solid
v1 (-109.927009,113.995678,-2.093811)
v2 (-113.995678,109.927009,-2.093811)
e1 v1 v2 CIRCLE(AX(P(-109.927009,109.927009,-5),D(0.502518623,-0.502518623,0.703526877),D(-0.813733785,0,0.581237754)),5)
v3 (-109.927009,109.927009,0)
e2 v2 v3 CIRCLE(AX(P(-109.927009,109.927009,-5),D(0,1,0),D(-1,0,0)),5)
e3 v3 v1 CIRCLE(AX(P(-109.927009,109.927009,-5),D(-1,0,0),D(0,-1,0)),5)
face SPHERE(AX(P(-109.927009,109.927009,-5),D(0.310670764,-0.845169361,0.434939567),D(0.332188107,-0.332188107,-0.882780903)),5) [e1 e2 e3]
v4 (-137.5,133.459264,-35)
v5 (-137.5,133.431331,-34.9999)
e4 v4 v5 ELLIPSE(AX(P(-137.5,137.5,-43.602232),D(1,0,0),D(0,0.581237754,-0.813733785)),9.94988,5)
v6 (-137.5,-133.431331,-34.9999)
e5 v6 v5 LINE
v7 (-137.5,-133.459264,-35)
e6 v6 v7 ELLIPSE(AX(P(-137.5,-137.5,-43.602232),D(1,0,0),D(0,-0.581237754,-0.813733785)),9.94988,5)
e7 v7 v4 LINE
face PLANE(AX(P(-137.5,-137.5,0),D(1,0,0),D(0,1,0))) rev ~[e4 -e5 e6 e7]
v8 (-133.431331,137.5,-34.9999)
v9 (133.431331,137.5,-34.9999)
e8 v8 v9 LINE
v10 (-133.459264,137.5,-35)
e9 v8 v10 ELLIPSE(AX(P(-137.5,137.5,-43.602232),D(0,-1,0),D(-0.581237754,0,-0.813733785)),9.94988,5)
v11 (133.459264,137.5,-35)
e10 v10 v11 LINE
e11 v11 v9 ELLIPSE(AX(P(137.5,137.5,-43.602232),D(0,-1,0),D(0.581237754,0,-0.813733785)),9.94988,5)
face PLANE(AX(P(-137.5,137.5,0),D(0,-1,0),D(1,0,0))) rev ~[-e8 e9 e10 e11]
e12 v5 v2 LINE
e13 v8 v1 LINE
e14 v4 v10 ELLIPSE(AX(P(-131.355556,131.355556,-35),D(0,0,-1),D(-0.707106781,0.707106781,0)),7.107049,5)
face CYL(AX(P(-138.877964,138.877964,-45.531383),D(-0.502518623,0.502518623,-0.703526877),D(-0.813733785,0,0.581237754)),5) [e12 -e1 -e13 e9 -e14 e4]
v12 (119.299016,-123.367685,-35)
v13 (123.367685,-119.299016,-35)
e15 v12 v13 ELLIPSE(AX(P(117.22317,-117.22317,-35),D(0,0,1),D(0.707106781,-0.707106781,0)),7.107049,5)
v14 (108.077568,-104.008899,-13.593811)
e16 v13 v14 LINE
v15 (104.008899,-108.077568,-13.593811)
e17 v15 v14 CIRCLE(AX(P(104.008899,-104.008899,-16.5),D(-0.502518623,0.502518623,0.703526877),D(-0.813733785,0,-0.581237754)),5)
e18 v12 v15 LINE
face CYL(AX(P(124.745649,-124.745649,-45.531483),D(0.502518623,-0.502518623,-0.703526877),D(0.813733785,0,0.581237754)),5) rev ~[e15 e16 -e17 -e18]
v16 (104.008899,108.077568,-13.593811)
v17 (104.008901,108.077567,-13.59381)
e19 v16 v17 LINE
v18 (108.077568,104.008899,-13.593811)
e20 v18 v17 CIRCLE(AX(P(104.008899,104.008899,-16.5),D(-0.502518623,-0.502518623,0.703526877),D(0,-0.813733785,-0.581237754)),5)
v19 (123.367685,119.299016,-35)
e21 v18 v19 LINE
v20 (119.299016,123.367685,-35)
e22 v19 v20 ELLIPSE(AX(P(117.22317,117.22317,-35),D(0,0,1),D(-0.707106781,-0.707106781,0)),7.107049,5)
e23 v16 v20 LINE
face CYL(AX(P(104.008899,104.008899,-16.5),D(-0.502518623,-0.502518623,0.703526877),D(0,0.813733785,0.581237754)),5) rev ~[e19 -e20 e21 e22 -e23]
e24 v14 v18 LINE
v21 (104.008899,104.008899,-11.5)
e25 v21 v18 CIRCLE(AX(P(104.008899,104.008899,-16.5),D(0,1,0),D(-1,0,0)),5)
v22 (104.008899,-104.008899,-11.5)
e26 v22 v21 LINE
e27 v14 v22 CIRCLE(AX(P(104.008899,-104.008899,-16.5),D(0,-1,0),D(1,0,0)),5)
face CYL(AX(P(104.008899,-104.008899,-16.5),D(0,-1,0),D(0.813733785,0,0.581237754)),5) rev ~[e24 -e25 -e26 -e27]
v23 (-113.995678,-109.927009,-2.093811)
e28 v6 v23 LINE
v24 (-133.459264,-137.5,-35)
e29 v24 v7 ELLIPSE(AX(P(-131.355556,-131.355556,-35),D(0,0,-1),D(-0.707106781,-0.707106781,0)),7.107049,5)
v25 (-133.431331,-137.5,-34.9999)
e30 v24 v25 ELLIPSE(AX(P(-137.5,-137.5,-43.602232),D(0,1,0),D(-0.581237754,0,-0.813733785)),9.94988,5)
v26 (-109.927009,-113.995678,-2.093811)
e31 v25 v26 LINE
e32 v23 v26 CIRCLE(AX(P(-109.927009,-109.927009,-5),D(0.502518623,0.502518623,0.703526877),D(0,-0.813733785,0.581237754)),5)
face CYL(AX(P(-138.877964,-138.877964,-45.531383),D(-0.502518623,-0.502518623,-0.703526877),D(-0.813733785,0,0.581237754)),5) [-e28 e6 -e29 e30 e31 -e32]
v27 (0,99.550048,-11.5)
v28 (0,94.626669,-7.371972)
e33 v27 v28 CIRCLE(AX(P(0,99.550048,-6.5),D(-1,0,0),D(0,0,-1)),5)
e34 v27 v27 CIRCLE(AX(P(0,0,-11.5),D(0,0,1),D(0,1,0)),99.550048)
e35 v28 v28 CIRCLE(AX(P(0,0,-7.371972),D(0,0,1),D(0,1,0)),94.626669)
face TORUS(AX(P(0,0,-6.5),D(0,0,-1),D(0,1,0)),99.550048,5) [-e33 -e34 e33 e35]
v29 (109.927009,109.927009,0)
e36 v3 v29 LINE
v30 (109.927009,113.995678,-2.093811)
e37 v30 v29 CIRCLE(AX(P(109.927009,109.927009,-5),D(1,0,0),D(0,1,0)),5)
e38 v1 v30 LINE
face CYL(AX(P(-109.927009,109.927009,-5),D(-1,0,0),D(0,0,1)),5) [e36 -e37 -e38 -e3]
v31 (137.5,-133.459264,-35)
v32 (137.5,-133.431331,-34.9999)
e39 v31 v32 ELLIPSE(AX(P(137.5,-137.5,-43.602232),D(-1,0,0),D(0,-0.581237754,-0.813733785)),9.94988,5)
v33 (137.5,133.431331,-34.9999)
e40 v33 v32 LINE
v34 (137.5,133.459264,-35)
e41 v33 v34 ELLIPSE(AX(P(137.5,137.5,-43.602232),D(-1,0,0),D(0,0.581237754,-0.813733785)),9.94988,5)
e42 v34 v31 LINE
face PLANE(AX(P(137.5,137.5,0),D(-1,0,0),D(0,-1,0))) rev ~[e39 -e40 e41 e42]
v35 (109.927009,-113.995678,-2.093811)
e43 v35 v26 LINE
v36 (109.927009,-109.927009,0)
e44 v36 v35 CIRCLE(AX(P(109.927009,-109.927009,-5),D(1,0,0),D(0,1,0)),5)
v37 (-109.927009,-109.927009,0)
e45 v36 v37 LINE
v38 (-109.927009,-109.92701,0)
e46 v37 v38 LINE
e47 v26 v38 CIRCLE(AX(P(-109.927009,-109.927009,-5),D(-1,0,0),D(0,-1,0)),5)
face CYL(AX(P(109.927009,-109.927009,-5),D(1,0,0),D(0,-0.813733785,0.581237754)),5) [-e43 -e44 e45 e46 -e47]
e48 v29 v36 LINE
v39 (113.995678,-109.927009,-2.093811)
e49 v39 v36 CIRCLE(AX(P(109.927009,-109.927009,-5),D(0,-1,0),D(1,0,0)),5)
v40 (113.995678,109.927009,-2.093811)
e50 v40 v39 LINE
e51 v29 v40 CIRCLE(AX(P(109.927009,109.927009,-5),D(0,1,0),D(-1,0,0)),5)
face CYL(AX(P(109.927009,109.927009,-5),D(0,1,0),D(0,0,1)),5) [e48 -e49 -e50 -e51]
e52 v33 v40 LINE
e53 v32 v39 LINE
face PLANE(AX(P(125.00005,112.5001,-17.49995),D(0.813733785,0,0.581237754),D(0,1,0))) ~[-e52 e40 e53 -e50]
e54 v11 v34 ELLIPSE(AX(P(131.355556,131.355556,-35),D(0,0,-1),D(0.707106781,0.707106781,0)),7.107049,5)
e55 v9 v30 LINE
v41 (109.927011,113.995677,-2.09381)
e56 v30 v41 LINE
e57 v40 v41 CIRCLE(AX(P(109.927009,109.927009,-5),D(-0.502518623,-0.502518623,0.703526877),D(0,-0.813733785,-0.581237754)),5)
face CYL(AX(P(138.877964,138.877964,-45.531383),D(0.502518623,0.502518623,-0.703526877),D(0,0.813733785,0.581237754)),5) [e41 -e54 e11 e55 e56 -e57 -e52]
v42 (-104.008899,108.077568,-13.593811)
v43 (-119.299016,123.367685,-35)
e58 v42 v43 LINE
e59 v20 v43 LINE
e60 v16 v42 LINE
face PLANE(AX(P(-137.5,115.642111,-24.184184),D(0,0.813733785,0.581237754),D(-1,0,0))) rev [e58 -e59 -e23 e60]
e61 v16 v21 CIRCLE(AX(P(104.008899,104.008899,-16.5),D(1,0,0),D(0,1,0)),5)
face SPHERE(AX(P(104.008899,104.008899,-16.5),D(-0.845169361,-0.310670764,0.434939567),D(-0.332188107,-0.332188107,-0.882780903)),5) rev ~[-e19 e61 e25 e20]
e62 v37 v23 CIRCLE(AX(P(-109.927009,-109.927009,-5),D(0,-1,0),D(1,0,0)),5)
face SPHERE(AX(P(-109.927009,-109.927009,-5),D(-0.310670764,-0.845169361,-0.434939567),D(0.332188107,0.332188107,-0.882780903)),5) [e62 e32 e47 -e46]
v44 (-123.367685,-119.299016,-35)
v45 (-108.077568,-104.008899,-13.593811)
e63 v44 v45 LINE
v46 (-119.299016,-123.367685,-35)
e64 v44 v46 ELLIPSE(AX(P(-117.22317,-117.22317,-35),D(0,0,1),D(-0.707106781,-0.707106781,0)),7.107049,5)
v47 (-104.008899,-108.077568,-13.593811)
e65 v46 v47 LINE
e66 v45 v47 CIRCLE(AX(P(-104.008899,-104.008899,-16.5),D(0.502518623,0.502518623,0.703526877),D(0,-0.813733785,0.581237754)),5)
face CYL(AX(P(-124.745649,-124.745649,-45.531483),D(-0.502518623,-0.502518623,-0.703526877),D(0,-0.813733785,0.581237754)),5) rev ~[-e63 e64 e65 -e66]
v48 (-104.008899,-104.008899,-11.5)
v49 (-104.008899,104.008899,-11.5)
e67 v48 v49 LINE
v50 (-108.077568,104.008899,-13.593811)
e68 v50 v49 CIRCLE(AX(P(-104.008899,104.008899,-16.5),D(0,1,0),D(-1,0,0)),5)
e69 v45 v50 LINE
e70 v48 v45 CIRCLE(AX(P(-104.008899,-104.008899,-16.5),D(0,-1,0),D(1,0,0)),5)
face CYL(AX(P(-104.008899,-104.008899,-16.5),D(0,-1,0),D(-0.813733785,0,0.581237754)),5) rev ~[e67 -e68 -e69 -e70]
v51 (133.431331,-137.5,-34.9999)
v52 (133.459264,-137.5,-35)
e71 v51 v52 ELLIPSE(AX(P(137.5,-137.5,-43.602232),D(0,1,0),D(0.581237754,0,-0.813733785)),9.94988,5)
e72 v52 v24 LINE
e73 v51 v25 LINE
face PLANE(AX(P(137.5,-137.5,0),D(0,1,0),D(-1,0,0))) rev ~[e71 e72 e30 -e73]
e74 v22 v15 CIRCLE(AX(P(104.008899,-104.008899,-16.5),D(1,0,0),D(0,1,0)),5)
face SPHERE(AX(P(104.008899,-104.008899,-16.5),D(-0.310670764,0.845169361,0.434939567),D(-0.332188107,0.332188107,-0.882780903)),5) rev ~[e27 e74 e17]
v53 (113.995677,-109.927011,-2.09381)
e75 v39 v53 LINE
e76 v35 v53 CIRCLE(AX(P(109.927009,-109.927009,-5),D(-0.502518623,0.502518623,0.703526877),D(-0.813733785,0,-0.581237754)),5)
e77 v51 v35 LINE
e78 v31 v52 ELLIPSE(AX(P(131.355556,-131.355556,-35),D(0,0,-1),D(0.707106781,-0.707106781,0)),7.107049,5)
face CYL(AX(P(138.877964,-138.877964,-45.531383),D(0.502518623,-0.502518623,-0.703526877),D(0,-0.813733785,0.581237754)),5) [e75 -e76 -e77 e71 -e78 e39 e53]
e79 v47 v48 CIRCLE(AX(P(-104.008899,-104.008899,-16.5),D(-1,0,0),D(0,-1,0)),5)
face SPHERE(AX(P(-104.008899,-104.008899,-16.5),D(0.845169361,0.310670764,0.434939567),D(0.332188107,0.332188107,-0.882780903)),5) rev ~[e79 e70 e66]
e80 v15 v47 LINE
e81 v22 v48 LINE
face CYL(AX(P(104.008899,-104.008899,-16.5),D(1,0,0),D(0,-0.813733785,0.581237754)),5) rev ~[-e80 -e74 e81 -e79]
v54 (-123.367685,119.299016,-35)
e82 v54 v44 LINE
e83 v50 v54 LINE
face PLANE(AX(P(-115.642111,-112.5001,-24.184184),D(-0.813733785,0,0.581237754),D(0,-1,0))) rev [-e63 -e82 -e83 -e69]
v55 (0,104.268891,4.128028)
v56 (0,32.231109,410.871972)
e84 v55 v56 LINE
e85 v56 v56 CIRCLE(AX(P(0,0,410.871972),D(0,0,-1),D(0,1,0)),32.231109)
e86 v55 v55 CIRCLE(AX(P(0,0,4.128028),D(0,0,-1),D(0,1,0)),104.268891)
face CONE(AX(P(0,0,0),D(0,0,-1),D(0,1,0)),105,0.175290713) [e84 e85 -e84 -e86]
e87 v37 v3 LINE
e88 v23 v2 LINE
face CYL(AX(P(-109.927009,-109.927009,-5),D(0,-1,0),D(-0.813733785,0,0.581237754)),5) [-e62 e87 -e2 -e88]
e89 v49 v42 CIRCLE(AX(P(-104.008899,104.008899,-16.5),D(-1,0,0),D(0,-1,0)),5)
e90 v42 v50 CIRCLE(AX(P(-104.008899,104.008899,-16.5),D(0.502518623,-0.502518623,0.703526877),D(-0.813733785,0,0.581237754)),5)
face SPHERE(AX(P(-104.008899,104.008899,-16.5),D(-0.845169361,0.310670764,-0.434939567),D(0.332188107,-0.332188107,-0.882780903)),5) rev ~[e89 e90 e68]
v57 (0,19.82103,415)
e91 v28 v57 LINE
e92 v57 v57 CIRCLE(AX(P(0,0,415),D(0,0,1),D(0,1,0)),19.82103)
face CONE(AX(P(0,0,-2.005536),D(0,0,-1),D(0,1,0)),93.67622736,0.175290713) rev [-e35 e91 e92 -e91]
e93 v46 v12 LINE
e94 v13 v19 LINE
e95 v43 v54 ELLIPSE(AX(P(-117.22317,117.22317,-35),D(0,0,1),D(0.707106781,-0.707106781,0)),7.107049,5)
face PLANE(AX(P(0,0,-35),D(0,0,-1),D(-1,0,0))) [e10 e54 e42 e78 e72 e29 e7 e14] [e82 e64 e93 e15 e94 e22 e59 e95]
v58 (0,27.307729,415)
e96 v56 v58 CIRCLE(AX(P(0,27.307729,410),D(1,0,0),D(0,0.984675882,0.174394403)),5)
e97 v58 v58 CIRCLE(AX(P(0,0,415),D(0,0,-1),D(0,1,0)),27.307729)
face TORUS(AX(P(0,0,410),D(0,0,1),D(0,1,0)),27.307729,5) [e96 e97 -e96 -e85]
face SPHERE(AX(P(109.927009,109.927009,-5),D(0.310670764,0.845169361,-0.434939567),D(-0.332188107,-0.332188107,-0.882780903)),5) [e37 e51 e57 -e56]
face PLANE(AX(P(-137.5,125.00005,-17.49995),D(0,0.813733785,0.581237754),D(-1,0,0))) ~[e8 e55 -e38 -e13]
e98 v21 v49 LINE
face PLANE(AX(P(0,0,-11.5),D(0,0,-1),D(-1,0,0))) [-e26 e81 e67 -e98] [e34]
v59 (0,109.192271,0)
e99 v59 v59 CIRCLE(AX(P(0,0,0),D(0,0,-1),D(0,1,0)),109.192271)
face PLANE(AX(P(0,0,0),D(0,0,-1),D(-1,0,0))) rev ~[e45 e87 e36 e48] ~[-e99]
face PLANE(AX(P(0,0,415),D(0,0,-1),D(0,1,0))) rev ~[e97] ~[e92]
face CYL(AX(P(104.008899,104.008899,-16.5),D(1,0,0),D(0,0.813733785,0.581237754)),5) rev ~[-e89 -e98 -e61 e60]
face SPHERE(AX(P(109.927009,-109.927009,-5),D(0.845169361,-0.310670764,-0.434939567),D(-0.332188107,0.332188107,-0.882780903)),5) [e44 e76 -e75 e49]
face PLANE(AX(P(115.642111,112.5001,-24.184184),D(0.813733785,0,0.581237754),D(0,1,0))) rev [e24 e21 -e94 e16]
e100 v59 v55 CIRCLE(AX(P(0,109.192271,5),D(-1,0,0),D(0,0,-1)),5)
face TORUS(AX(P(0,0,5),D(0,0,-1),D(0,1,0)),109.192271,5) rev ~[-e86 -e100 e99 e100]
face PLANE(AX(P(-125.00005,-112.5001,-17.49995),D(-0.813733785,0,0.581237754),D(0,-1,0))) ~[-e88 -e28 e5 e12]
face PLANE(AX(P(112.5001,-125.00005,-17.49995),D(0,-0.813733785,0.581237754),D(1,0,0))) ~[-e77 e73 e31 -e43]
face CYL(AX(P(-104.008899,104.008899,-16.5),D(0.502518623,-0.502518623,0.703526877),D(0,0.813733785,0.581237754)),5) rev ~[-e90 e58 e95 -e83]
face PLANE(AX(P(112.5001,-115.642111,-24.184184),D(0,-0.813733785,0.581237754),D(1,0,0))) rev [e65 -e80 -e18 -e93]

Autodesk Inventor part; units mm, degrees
ref_plane "YZ Plane" through (0, 0, 0) normal (1, 0, 0) x (0, 1, 0)
ref_plane "XZ Plane" through (0, 0, 0) normal (0, 1, 0) x (-1, 0, 0)
ref_plane "XY Plane" through (0, 0, 0) normal (0, 0, 1) x (1, 0, 0)
sketch "スケッチ1" plane through (0, 0, 0) normal (1, 0, 0) x (0, 1, 0)
  line L0 (0, 0) -> (105, 0)
  line L1 (105, 0) -> (31.5, 415)
  line L2 (31.5, 415) -> (0, 415)
  line L3 (0, 415) -> (0, 0)
  dimension "d0" = 415
  dimension "d1" = 31.5
  dimension "d2" = 105
revolve "回転1" add sketch "スケッチ1" angle 360 about axis through (0, 0, 415) along (0, 0, -1)
sketch "スケッチ2" plane through (0, 0, 0) normal (0, 0, -1) x (-1, 0, 0)
  line L0 (-137.5, -137.5) -> (137.5, -137.5)
  line L1 (137.5, -137.5) -> (137.5, 137.5)
  line L2 (137.5, 137.5) -> (-137.5, 137.5)
  line L3 (-137.5, 137.5) -> (-137.5, -137.5)
  line L4 (-137.5, -137.5) -> (137.5, 137.5) construction
  line L5 (137.5, -137.5) -> (-137.5, 137.5) construction
  point P0 (0, 0)
  dimension "d4" = 275
  dimension "d5" = 275
extrude "押し出し1" add sketch "スケッチ2" along normal blind 35
chamfer "面取り3" distance 35 distance2 25 1 edges at (0, 137.5, 0) measured on face at (-45.8333, 137.5, -11.6667)
chamfer "面取り4" distance 35 distance2 25 1 edges at (137.5, -12.5, 0) measured on face at (137.5, 37.5, -23.3333)
chamfer "面取り5" distance 35 distance2 25 1 edges at (-12.5, -137.5, 0) measured on face at (37.5, -137.5, -23.3333)
chamfer "面取り6" distance 35 distance2 25 1 edges at (-137.5, 0, 0) measured on face at (-137.5, -37.5, -23.3333)
shell "シェル1" thickness 11.5 removed faces 2 at (9.3296, 8.757, 415) at (45.8333, -45.8333, -35)
fillet "フィレット2" radius 5 19 edges at (0, -31.5, 415) (112.5001, 0, 0) (0, -112.5001, 0) (125, -125.0001, -17.5) (0, -105, 0) (125.0001, 125, -17.5) (0, 112.5001, 0) (-112.5001, 0, 0) (-125.0001, 125, -17.4999) (-125.0001, -125, -17.5) (0, -95.3578, -11.5) (0, -106.582, -11.5) (-106.582, 0, -11.5) (-114.9748, -114.9748, -23.25) (0, 106.582, -11.5) (106.582, 0, -11.5) (114.9748, 114.9748, -23.25) (-114.9748, 114.9748, -23.25) (114.9748, -114.9748, -23.25)
equation "\"d5\" = d4"
properties part number "mini_corn"
